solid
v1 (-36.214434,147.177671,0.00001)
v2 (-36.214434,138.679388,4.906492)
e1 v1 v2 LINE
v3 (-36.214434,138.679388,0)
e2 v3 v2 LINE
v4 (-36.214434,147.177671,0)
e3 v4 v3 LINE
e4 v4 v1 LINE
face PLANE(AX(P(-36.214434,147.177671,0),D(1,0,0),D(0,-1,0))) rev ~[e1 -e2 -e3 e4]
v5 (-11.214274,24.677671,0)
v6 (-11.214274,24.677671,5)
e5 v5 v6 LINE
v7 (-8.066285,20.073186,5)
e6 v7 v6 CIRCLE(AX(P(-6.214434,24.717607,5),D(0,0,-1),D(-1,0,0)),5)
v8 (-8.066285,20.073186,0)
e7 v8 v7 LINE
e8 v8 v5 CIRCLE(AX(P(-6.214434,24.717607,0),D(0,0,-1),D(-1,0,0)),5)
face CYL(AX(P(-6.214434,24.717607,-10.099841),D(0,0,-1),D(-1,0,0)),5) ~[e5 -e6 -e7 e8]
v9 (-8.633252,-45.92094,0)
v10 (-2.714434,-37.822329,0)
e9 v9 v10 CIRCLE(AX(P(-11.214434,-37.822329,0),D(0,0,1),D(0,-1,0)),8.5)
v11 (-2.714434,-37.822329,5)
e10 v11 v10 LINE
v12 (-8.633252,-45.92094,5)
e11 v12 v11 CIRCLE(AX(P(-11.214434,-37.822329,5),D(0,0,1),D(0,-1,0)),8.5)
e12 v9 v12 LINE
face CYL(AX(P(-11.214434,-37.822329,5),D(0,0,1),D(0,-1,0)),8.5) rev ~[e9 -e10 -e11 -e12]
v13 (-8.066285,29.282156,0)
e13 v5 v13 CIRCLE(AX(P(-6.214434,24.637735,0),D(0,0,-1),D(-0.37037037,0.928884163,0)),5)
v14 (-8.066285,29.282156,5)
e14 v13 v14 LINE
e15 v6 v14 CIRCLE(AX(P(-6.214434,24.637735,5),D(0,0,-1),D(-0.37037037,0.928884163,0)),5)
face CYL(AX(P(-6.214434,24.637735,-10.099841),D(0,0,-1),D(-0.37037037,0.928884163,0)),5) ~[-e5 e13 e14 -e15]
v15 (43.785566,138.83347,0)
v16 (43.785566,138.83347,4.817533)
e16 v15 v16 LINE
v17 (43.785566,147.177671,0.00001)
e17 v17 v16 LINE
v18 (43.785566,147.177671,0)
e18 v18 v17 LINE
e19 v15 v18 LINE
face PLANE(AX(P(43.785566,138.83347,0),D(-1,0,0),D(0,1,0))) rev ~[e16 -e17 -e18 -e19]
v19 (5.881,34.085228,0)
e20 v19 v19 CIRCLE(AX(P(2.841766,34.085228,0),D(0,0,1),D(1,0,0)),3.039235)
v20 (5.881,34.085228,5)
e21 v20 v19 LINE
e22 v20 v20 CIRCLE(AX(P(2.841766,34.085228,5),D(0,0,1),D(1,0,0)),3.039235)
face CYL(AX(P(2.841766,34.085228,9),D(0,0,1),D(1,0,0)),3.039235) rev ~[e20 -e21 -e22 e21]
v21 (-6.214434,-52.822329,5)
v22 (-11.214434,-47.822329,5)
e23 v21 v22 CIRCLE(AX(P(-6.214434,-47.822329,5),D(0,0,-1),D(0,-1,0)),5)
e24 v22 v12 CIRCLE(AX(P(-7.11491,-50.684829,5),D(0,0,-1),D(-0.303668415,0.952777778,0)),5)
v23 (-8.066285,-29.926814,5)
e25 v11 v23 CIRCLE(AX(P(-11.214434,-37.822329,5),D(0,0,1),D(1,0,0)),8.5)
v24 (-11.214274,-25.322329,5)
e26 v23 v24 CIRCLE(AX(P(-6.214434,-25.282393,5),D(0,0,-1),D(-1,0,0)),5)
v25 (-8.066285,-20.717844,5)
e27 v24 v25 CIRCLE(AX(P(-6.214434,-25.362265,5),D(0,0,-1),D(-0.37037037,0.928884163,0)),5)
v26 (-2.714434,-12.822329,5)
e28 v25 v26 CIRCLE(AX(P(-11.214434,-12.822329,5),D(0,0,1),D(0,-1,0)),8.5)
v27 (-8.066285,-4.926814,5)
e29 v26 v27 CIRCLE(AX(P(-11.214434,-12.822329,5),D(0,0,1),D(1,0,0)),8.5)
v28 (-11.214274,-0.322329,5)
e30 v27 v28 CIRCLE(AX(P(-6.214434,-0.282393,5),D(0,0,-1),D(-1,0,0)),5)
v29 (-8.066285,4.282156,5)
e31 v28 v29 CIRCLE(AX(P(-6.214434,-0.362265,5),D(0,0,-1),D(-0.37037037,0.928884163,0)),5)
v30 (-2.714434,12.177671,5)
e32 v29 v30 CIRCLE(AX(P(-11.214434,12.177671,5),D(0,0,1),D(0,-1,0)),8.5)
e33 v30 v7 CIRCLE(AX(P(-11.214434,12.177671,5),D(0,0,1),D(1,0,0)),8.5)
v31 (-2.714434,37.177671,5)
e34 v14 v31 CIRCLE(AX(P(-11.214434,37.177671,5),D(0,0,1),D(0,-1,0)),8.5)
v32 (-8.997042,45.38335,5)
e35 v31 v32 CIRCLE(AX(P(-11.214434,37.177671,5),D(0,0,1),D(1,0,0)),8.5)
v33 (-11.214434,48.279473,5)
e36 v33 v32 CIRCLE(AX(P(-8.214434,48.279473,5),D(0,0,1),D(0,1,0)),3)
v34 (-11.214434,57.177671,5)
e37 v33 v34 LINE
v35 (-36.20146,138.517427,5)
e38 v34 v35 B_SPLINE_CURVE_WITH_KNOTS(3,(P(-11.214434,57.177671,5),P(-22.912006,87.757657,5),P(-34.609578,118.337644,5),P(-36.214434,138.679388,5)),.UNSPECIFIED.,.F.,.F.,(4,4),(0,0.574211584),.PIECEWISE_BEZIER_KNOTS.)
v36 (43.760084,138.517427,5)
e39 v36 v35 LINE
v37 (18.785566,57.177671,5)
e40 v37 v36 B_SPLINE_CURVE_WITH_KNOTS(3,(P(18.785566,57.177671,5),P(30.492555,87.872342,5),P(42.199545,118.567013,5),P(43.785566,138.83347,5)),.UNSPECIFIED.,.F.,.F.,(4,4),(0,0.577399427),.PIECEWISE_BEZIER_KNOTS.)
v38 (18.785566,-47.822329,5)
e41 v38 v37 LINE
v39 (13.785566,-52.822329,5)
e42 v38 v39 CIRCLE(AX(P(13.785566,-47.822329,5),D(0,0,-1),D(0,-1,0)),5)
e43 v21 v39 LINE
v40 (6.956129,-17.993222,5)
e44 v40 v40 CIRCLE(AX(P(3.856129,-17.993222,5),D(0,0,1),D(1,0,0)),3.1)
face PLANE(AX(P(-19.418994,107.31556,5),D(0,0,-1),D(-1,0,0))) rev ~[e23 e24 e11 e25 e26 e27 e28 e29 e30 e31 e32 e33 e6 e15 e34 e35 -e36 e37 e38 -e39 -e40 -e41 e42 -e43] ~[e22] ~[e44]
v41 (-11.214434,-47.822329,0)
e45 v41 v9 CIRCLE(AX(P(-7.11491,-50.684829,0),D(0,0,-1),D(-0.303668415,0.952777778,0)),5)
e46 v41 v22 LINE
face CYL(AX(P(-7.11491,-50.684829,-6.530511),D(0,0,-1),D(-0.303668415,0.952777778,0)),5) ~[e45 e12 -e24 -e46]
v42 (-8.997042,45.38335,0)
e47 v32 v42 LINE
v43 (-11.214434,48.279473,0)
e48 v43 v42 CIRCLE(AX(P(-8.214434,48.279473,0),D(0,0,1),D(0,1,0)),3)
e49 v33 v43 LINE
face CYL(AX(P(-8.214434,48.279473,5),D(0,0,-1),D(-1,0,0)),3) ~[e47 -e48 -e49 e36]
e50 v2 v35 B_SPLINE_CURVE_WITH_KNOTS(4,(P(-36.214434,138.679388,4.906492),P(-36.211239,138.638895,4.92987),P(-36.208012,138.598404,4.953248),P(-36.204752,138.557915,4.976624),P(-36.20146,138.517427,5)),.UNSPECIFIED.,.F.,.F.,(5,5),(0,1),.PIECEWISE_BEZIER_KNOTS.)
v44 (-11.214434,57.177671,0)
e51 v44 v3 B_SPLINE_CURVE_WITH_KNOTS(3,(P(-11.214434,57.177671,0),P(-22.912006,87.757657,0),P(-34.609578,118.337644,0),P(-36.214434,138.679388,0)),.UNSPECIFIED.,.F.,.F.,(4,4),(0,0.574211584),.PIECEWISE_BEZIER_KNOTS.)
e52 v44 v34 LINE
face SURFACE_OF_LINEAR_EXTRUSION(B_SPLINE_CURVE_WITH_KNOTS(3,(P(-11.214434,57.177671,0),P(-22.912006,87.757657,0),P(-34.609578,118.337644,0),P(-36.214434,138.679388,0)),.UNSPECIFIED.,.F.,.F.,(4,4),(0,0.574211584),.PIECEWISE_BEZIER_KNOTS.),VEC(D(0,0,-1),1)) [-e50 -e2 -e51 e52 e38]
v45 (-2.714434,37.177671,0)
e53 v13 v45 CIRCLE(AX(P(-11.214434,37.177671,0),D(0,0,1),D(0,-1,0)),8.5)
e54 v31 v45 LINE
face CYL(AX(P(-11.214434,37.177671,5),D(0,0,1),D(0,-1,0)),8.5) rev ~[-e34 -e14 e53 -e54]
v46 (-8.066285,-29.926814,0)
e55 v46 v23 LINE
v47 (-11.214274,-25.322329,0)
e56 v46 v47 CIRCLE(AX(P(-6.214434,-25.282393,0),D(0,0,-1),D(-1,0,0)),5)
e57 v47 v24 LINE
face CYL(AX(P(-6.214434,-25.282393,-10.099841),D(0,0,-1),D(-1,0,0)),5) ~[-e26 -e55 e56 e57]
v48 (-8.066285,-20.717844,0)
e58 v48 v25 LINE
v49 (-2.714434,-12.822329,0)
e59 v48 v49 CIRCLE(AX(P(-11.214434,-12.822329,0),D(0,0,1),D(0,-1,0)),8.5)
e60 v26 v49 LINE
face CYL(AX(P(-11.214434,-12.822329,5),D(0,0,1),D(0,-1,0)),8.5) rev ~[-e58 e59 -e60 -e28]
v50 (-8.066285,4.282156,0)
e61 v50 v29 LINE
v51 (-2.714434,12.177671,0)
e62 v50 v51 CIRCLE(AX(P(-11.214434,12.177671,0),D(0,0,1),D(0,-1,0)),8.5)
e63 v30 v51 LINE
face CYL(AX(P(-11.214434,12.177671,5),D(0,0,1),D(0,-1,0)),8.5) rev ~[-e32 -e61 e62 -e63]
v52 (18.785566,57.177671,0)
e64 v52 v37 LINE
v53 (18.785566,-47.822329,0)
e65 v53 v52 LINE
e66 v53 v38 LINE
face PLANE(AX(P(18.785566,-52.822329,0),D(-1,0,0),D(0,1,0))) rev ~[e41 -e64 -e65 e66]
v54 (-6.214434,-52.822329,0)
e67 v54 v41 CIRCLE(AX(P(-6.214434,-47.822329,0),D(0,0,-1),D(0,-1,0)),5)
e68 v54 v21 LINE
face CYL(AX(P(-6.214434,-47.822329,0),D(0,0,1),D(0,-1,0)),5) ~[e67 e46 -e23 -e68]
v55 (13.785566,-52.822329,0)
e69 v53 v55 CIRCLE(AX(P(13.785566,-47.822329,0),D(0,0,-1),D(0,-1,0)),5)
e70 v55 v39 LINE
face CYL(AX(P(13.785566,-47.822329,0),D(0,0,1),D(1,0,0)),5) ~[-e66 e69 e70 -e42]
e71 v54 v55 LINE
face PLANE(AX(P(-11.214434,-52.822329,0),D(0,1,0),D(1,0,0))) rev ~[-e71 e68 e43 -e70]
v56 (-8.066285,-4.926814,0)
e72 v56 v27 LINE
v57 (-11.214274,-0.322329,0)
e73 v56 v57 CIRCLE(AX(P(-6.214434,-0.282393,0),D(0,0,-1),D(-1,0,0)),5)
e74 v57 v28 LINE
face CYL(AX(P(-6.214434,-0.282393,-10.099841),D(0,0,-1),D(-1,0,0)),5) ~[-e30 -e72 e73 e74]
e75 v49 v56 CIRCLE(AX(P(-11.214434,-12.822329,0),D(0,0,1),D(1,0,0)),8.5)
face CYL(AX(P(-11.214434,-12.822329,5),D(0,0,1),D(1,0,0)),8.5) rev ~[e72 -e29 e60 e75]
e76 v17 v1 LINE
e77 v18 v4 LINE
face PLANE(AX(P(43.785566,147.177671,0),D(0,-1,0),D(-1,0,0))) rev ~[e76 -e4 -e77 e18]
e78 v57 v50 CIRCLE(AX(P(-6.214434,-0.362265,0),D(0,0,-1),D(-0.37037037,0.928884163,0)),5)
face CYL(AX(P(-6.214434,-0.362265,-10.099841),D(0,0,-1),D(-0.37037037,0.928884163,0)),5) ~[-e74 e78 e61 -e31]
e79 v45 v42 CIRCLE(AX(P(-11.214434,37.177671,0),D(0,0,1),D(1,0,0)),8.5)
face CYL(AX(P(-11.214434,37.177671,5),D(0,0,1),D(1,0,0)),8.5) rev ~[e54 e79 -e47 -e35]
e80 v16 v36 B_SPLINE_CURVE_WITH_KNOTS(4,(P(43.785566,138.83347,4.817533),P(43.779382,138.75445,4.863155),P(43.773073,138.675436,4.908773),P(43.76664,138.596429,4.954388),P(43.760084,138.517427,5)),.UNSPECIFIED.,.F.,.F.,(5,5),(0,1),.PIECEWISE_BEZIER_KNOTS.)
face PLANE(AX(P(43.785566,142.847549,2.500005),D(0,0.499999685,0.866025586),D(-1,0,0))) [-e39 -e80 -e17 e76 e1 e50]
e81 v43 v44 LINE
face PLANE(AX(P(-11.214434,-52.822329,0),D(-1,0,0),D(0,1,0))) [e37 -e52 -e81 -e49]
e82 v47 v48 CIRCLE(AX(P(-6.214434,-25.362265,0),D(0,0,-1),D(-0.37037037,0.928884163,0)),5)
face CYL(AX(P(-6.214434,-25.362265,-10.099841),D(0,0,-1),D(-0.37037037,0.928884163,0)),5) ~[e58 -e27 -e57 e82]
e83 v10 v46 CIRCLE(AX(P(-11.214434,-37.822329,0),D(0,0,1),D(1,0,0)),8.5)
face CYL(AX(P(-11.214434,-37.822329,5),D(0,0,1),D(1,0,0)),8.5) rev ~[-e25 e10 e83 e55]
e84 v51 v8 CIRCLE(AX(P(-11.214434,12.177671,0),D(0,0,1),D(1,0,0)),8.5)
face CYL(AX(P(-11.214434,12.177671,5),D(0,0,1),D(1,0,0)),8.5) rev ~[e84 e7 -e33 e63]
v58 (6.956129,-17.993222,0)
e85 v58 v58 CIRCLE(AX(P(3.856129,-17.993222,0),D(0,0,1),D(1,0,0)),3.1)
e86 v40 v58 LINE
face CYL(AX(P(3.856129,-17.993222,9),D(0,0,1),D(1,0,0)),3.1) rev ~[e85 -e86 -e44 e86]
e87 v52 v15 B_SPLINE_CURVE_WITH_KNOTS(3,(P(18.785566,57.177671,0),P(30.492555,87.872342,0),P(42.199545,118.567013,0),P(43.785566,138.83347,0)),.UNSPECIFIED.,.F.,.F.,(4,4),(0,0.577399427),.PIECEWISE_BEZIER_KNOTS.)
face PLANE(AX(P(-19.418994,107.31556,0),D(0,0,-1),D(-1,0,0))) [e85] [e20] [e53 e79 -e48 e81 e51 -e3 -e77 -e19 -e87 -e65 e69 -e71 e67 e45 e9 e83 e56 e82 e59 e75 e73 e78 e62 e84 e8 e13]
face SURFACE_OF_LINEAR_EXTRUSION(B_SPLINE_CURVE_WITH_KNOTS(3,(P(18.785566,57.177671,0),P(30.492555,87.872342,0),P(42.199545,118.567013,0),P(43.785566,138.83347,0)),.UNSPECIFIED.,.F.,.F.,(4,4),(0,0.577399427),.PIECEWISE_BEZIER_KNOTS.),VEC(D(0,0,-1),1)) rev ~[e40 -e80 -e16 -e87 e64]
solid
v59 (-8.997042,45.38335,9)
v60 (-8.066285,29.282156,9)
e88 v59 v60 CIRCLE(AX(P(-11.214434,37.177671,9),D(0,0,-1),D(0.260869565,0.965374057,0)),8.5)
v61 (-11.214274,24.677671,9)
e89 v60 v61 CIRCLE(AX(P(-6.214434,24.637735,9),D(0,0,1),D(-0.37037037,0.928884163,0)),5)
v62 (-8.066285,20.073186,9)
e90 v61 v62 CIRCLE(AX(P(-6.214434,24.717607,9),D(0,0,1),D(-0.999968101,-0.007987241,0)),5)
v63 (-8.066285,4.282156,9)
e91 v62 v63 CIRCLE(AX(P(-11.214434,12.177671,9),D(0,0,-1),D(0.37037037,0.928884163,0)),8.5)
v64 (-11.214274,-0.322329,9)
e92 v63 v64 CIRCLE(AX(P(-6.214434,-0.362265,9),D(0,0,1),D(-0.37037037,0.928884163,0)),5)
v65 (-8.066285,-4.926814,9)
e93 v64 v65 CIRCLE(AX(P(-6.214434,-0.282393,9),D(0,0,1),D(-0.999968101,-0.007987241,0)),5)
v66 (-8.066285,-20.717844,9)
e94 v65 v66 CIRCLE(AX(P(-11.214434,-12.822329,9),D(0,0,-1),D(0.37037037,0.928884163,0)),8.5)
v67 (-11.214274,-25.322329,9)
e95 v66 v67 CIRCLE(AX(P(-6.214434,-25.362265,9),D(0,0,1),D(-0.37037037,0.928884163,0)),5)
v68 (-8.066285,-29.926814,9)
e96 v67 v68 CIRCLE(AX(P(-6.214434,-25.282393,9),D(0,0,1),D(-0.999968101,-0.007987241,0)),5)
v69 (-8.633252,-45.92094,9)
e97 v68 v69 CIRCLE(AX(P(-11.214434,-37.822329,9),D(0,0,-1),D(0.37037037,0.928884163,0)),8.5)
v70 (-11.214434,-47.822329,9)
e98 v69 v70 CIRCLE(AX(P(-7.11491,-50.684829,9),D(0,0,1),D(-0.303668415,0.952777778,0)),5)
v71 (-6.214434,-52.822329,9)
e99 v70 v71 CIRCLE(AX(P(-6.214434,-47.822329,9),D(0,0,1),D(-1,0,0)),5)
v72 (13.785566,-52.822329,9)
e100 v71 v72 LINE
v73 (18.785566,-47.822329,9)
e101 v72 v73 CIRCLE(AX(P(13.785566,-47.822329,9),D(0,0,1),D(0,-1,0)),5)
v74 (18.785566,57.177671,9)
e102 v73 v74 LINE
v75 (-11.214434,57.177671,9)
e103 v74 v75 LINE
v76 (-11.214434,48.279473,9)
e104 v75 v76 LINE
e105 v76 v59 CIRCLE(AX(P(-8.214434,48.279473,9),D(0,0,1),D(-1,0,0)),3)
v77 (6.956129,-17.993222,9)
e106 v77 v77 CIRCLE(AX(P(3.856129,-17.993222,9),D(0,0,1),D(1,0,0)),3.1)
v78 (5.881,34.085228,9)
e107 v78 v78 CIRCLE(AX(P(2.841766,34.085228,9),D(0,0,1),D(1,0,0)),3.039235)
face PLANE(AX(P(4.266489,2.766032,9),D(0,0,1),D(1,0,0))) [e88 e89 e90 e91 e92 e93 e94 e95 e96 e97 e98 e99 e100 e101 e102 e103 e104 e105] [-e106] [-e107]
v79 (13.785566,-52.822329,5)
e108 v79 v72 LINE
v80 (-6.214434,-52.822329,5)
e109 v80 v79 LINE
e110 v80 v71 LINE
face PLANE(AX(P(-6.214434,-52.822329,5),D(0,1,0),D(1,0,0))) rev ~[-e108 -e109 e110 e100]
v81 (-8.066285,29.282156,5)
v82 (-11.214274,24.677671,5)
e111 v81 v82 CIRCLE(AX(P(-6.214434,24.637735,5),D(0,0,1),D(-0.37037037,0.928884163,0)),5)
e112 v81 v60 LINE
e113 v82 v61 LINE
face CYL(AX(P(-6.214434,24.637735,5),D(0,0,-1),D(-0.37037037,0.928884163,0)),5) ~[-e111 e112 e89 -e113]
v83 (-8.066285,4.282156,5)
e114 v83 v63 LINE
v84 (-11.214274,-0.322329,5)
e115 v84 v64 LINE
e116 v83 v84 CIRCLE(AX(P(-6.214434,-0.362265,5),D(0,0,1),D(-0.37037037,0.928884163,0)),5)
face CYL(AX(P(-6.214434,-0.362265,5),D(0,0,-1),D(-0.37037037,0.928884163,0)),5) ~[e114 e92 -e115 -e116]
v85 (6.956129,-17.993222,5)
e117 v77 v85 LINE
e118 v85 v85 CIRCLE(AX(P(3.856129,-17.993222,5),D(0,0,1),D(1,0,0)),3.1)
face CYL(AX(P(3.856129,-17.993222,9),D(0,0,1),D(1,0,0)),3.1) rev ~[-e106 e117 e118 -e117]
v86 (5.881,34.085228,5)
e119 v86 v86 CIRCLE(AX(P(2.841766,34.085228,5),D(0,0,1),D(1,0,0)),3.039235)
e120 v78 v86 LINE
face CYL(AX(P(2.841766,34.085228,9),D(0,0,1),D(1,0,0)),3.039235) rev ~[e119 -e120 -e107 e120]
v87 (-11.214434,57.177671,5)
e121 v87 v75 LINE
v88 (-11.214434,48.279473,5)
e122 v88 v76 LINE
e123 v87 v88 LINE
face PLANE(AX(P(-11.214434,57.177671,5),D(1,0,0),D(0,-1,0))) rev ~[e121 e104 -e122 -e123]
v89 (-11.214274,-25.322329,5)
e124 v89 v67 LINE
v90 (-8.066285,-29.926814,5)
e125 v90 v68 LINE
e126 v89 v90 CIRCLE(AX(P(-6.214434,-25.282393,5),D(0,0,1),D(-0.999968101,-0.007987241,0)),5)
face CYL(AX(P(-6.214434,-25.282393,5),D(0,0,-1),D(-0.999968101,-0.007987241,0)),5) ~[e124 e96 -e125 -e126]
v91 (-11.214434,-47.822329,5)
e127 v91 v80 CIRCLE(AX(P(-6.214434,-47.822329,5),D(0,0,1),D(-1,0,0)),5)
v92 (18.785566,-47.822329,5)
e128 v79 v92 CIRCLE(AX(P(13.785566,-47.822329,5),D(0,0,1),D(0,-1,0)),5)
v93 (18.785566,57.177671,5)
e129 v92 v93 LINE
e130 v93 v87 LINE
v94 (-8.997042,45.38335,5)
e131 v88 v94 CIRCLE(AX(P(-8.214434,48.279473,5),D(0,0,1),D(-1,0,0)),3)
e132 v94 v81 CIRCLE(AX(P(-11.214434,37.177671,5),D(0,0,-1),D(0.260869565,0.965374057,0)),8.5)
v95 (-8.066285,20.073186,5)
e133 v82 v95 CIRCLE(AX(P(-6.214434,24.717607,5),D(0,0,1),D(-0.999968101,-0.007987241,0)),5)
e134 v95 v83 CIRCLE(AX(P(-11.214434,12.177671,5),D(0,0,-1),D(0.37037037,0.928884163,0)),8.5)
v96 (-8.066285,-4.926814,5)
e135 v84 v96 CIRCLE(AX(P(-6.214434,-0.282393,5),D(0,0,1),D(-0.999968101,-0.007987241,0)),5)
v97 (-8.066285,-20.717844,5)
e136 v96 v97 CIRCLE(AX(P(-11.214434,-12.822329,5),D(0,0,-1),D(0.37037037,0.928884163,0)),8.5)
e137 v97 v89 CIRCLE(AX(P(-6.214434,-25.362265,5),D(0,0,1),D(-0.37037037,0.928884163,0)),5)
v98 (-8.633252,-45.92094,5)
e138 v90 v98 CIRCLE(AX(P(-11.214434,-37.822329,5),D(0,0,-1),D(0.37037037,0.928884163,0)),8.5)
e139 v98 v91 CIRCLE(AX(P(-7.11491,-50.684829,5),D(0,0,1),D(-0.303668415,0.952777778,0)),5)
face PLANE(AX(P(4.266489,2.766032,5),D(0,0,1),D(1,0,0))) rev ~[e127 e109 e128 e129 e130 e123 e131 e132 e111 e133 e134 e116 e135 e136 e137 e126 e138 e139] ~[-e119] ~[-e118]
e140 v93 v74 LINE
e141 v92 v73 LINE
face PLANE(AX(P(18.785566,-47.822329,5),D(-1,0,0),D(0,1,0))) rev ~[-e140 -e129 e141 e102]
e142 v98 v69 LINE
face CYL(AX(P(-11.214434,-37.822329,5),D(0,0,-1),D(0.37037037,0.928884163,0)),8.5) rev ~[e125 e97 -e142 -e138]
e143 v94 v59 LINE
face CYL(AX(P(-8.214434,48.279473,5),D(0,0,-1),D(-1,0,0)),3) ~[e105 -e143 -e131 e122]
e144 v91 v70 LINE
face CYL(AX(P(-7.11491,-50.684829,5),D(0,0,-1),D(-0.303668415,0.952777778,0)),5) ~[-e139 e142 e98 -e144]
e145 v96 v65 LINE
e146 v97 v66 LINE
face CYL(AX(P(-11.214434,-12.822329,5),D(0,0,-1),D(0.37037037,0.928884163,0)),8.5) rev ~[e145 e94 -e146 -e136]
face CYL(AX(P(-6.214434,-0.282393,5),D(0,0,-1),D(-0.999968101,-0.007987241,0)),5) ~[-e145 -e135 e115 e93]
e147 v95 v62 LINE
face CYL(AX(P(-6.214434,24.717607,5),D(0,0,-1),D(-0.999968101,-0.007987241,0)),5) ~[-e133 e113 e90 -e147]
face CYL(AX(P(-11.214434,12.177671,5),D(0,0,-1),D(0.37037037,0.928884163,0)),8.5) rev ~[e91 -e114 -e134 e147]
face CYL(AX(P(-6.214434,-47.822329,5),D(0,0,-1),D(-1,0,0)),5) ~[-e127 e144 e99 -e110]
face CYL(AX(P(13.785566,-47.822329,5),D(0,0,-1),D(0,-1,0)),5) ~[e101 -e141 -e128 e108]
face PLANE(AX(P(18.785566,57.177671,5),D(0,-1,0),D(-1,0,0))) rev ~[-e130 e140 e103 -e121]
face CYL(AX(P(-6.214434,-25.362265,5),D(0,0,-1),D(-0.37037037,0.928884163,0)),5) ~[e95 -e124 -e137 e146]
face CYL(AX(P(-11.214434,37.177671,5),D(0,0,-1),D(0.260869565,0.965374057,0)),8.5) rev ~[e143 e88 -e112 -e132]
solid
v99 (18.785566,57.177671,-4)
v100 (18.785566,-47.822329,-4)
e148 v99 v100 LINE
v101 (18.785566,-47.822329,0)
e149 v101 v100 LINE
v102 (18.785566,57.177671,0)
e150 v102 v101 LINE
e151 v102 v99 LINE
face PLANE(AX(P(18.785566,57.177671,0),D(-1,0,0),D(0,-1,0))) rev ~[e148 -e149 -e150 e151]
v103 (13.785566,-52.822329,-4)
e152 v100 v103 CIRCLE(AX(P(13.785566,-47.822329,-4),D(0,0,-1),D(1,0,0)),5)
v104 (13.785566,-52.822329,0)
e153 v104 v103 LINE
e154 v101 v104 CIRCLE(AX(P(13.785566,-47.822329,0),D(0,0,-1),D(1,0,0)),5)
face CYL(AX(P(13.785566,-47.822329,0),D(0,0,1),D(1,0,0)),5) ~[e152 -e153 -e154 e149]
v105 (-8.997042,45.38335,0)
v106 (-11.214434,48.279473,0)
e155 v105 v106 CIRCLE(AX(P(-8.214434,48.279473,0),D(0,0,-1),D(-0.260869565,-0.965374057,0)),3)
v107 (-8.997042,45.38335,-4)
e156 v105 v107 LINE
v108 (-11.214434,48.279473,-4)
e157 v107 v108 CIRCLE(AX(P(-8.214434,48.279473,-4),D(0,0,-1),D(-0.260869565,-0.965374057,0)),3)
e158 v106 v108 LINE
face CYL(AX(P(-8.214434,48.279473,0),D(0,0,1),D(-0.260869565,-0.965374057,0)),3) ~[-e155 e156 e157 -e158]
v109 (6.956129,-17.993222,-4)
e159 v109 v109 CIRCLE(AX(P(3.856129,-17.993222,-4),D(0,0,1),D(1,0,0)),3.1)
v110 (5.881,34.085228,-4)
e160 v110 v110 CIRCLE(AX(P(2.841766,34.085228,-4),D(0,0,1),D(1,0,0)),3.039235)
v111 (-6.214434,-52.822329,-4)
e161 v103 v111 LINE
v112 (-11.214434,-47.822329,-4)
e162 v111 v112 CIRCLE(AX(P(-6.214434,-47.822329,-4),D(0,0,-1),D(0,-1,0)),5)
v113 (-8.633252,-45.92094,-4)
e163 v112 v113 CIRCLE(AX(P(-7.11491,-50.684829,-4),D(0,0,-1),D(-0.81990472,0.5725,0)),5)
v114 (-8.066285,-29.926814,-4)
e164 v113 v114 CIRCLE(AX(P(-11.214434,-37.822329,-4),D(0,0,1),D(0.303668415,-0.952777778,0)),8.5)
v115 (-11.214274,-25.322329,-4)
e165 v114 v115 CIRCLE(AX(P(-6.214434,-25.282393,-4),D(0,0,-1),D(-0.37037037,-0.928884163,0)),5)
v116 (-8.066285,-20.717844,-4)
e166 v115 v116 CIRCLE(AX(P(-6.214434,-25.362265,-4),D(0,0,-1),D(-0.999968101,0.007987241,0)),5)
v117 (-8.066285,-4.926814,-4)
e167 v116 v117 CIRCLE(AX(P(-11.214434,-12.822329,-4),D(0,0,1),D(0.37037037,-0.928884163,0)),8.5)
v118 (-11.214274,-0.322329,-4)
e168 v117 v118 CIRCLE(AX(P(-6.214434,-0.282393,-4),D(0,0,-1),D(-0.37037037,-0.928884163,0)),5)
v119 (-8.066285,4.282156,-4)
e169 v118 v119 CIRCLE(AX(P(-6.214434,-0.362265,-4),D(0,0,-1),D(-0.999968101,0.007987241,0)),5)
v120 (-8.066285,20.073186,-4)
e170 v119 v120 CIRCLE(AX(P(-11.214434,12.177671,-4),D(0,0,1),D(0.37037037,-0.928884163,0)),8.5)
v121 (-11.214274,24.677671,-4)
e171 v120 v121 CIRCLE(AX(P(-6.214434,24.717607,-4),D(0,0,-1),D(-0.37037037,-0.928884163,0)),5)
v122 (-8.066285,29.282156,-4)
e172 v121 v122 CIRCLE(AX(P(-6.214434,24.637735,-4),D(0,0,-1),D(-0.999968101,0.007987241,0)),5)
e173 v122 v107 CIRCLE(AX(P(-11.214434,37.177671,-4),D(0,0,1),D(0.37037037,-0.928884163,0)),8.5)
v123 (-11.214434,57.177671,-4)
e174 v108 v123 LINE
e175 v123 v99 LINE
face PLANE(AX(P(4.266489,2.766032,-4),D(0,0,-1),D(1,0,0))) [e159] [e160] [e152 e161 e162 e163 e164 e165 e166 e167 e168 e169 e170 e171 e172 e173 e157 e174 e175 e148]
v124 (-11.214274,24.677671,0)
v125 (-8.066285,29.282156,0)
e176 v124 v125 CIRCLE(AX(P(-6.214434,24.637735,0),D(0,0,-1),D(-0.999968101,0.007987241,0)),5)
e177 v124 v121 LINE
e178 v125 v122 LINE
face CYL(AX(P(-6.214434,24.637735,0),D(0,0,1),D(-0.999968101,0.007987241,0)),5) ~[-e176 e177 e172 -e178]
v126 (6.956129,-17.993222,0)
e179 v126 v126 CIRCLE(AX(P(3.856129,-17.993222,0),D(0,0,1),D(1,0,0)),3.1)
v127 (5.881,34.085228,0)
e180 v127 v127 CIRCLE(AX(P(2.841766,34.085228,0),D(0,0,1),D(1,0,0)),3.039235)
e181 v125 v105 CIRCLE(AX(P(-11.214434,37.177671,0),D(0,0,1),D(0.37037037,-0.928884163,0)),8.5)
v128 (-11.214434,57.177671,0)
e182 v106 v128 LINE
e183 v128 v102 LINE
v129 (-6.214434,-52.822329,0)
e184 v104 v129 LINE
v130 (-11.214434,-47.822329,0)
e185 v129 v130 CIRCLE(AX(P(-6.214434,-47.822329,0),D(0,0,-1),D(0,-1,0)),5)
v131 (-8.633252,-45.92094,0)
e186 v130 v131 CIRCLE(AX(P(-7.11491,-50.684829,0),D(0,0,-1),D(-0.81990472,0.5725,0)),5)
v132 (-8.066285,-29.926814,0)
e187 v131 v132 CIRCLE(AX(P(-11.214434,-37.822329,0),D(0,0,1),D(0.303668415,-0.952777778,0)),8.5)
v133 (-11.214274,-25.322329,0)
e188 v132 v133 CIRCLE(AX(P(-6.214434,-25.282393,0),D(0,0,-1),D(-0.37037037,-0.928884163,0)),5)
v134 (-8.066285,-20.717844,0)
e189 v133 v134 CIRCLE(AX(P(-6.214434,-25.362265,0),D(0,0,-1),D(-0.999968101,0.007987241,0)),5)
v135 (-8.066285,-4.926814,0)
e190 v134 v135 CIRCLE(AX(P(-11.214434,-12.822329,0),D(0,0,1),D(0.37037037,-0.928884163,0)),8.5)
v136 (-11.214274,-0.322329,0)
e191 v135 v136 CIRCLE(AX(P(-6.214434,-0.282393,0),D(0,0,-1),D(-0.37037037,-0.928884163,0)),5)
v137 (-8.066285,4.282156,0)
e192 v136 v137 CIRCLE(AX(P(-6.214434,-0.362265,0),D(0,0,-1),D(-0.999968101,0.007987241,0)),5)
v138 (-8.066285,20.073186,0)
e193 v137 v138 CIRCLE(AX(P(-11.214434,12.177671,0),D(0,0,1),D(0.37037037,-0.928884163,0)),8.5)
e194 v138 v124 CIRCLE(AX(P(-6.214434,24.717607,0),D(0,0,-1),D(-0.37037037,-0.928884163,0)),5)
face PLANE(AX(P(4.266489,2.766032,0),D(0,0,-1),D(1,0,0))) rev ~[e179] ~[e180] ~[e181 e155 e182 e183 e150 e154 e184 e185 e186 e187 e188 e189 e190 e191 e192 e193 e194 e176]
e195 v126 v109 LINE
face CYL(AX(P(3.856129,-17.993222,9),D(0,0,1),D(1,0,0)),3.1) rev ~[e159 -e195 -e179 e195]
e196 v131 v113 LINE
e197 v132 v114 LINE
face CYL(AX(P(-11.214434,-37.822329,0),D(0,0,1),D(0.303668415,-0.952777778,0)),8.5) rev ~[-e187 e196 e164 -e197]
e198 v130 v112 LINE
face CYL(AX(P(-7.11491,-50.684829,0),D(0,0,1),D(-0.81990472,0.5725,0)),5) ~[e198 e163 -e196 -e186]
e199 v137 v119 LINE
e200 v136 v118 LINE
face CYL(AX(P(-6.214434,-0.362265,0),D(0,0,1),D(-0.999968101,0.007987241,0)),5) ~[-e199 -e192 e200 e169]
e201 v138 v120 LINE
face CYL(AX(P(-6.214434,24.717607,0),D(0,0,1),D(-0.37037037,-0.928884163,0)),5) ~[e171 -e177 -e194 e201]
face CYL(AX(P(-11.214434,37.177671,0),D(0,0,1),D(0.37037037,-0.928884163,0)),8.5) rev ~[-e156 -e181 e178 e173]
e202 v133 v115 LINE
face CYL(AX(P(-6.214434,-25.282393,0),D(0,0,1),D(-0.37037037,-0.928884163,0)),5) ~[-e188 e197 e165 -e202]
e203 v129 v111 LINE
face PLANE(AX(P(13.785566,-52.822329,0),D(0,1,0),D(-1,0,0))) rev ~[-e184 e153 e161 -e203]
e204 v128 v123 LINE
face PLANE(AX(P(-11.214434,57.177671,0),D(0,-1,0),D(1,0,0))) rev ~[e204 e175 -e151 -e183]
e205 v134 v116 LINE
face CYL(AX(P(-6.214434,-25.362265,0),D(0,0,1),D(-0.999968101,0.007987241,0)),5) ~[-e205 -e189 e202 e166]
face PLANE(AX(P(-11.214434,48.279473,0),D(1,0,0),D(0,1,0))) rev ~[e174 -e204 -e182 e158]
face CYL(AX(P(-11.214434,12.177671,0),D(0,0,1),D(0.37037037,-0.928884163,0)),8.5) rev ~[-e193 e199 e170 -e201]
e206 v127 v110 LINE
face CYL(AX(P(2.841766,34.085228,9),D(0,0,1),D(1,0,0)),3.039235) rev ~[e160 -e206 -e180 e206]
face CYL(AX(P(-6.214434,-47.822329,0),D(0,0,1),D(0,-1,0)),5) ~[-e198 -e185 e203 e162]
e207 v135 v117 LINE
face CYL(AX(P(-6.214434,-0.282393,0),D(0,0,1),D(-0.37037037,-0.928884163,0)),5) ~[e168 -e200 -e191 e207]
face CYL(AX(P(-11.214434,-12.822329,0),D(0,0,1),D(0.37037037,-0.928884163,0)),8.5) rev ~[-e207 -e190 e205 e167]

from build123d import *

# Parameters (mm, degrees)
F0_W        = 30
F0_H        = 90
F0_H_2      = 110
F1_DEPTH    = 5
F3_R        = 5
F4_DEPTH    = 25
F5_T1_DEPTH = 25.1996810199
F5_T3_DEPTH = 18.0610213145
F6_R        = 3
F7_SIZE2    = 8.660244
F7_SIZE     = 4.99999
F9_DEPTH    = 4
F11_DEPTH   = 4
F12_R       = 3.0392347024
F12_R_2     = 3.1
F13_DEPTH   = 25


# Not quite as in the source:
# - a fillet or chamfer that OpenCascade refuses, or shapes differently, is made with other operations: its cross-section is extruded or revolved along the edge and cut away or added
# - a fillet or chamfer is up to 0.001 mm smaller than in the source, because OpenCascade refuses the exact size


with BuildPart() as f1:
    # F0 (on Top) → F1 (new body)
    with BuildSketch(Plane.XY):
        with BuildLine():
            add(Edge.make_bspline(
                [(-11.2144336104, 57.1776708961), (-22.912006026, 87.7576573075), (-34.6095784415, 118.3376437189), (-36.2144336104, 138.6793877413)],
                knots=[0, 0, 0, 0, 0.5742115835, 0.5742115835, 0.5742115835, 0.5742115835], degree=3))
            Line((-11.2144336104, 57.1776708961), (-11.2144336104, 147.1776708961))
            Line((-11.2144336104, 147.1776708961), (-36.2144336104, 147.1776708961))
            Line((-36.2144336104, 147.1776708961), (-36.2144336104, 138.6793877413))
        make_face()
        with Locations((3.7855663896, 102.1776708961)):
            Rectangle(F0_W, F0_H)
        with BuildLine():
            Line((18.7855663896, 147.1776708961), (18.7855663896, 57.1776708961))
            add(Edge.make_bspline(
                [(18.7855663896, 57.1776708961), (30.4925554698, 87.8723420853), (42.1995445501, 118.5670132745), (43.7855663896, 138.8334699858)],
                knots=[0, 0, 0, 0, 0.5773994274, 0.5773994274, 0.5773994274, 0.5773994274], degree=3))
            Line((43.7855663896, 138.8334699858), (43.7855663896, 147.1776708961))
            Line((43.7855663896, 147.1776708961), (18.7855663896, 147.1776708961))
        make_face()
        with Locations((3.7855663896, 2.1776708961)):
            Rectangle(F0_W, F0_H_2)
    extrude(amount=F1_DEPTH)

    # F3
    f3_edges = [f1.edges().sort_by_distance(p)[0] for p in [
        (-11.214434, -52.822329, 2.5),
        (18.785566, -52.822329, 2.5),
    ]]
    fillet(f3_edges, radius=F3_R)

    # F2 (on face) → F4 (cut)
    with BuildSketch(Plane.XY.offset(5)):
        with BuildLine():
            ThreePointArc((-11.2144336104, 28.6776708961), (-5.2040259704, 31.167263256), (-2.7144336104, 37.1776708961))
            ThreePointArc((-2.7144336104, 37.1776708961), (-5.2040259704, 43.1880785361), (-11.2144336104, 45.6776708961))
            Line((-11.2144336104, 45.6776708961), (-11.2144336104, 28.6776708961))
        make_face()
        with BuildLine():
            ThreePointArc((-2.7144336104, 12.1776708961), (-5.2040259704, 18.1880785361), (-11.2144336104, 20.6776708961))
            Line((-11.2144336104, 20.6776708961), (-11.2144336104, 3.6776708961))
            ThreePointArc((-11.2144336104, 3.6776708961), (-5.2040259704, 6.167263256), (-2.7144336104, 12.1776708961))
        make_face()
        with BuildLine():
            ThreePointArc((-2.7144336104, -12.8223291039), (-5.2040259704, -6.8119214639), (-11.2144336104, -4.3223291039))
            Line((-11.2144336104, -4.3223291039), (-11.2144336104, -21.3223291039))
            ThreePointArc((-11.2144336104, -21.3223291039), (-5.2040259704, -18.832736744), (-2.7144336104, -12.8223291039))
        make_face()
        with BuildLine():
            ThreePointArc((-2.7144336104, -37.8223291039), (-5.2040259704, -31.8119214639), (-11.2144336104, -29.3223291039))
            Line((-11.2144336104, -29.3223291039), (-11.2144336104, -46.3223291039))
            ThreePointArc((-11.2144336104, -46.3223291039), (-5.2040259704, -43.832736744), (-2.7144336104, -37.8223291039))
        make_face()
    extrude(amount=-F4_DEPTH, mode=Mode.SUBTRACT)

    # F5: fillet of radius 5 on 7 edges, made by hand

    # F5_s2 → F5_t1 (cut)
    with BuildSketch(Plane.XY.offset(-10.09984051)):
        with BuildLine():
            ThreePointArc((-11.2144336104, -0.2823929), (-10.3532292843, -3.0878109384), (-8.0662854623, -4.9268137163))
            ThreePointArc((-8.0662854623, -4.9268137163), (-9.6116049851, -4.4748180738), (-11.2144336104, -4.3223291039))
            Line((-11.2144336104, -4.3223291039), (-11.2144336104, -0.2823929))
        make_face()
        with BuildLine():
            ThreePointArc((-8.0662854623, 4.2821555084), (-10.3532292843, 2.4431527305), (-11.2144336104, -0.3622653079))
            Line((-11.2144336104, -0.3622653079), (-11.2144336104, 3.6776708961))
            ThreePointArc((-11.2144336104, 3.6776708961), (-9.6116049851, 3.8301598659), (-8.0662854623, 4.2821555084))
        make_face()
        with BuildLine():
            ThreePointArc((-8.0662854623, -20.7178444916), (-10.3532292843, -22.5568472695), (-11.2144336104, -25.3622653079))
            Line((-11.2144336104, -25.3622653079), (-11.2144336104, -21.3223291039))
            ThreePointArc((-11.2144336104, -21.3223291039), (-9.6116049851, -21.1698401341), (-8.0662854623, -20.7178444916))
        make_face()
        with BuildLine():
            ThreePointArc((-11.2144336104, -25.2823929), (-10.3532292843, -28.0878109384), (-8.0662854623, -29.9268137163))
            ThreePointArc((-8.0662854623, -29.9268137163), (-9.6116049851, -29.4748180738), (-11.2144336104, -29.3223291039))
            Line((-11.2144336104, -29.3223291039), (-11.2144336104, -25.2823929))
        make_face()
        with BuildLine():
            ThreePointArc((-11.2144336104, 24.7176071), (-10.3532292843, 21.9121890616), (-8.0662854623, 20.0731862837))
            ThreePointArc((-8.0662854623, 20.0731862837), (-9.6116049851, 20.5251819262), (-11.2144336104, 20.6776708961))
            Line((-11.2144336104, 20.6776708961), (-11.2144336104, 24.7176071))
        make_face()
        with BuildLine():
            ThreePointArc((-8.0662854623, 29.2821555084), (-10.3532292843, 27.4431527305), (-11.2144336104, 24.6377346921))
            Line((-11.2144336104, 24.6377346921), (-11.2144336104, 28.6776708961))
            ThreePointArc((-11.2144336104, 28.6776708961), (-9.6116049851, 28.8301598659), (-8.0662854623, 29.2821555084))
        make_face()
    extrude(amount=F5_T1_DEPTH, mode=Mode.SUBTRACT)

    # F5_s4 → F5_t3 (cut)
    with BuildSketch(Plane.XY.offset(-6.5305106572)):
        with BuildLine():
            ThreePointArc((-8.6332520843, -45.9209402151), (-10.0803650529, -46.6591519697), (-11.2144336104, -47.8223291039))
            Line((-11.2144336104, -47.8223291039), (-11.2144336104, -46.3223291039))
            ThreePointArc((-11.2144336104, -46.3223291039), (-9.908331479, -46.2213824567), (-8.6332520843, -45.9209402151))
        make_face()
    extrude(amount=F5_T3_DEPTH, mode=Mode.SUBTRACT)

    # F6
    f6_edges = [f1.edges().sort_by_distance(p)[0] for p in [
        (-11.214434, 45.677671, 2.5),
    ]]
    fillet(f6_edges, radius=F6_R)

    # F7 (size 5 and 8.6602540378 in the source; OpenCascade refuses exactly that, so slightly less here)
    f7_edges = [f1.edges().sort_by_distance(p)[0] for p in [
        (3.785566, 147.177671, 5),
    ]]
    f7_side = f1.faces().sort_by_distance((3.785566, 147.177671, 2.5))[0]
    chamfer(f7_edges, length=F7_SIZE, length2=F7_SIZE2, reference=f7_side)


with BuildPart() as f9:
    # F8 (on face) → F9 (new body)
    with BuildSketch(Plane.XY.offset(5)):
        with BuildLine():
            Line((18.7855663896, 57.1776708961), (-11.2144336104, 57.1776708961))
            Line((-11.2144336104, 57.1776708961), (-11.2144336104, 48.2794725516))
            ThreePointArc((-11.2144336104, 48.2794725516), (-10.5964313106, 46.455716275), (-8.9970423061, 45.3833503806))
            ThreePointArc((-8.9970423061, 45.3833503806), (-2.7285999753, 37.6682088837), (-8.0662854623, 29.2821555084))
            ThreePointArc((-8.0662854623, 29.2821555084), (-10.3419924147, 27.4596592689), (-11.2142741178, 24.677670896))
            ThreePointArc((-11.2142741178, 24.677670896), (-10.3419924147, 21.8956825232), (-8.0662854623, 20.0731862837))
            ThreePointArc((-8.0662854623, 20.0731862837), (-2.7144336104, 12.1776708961), (-8.0662854623, 4.2821555084))
            ThreePointArc((-8.0662854623, 4.2821555084), (-10.3419924147, 2.4596592689), (-11.2142741178, -0.322329104))
            ThreePointArc((-11.2142741178, -0.322329104), (-10.3419924147, -3.1043174768), (-8.0662854623, -4.9268137163))
            ThreePointArc((-8.0662854623, -4.9268137163), (-2.7144336104, -12.8223291039), (-8.0662854623, -20.7178444916))
            ThreePointArc((-8.0662854623, -20.7178444916), (-10.3419924147, -22.5403407311), (-11.2142741178, -25.322329104))
            ThreePointArc((-11.2142741178, -25.322329104), (-10.3419924147, -28.1043174768), (-8.0662854623, -29.9268137163))
            ThreePointArc((-8.0662854623, -29.9268137163), (-2.7197690942, -38.123451597), (-8.6332520843, -45.9209402151))
            ThreePointArc((-8.6332520843, -45.9209402151), (-10.0803650529, -46.6591519697), (-11.2144336104, -47.8223291039))
            ThreePointArc((-11.2144336104, -47.8223291039), (-9.7499675164, -51.3578630099), (-6.2144336104, -52.8223291039))
            Line((-6.2144336104, -52.8223291039), (13.7855663896, -52.8223291039))
            ThreePointArc((13.7855663896, -52.8223291039), (17.3211002955, -51.3578630099), (18.7855663896, -47.8223291039))
            Line((18.7855663896, -47.8223291039), (18.7855663896, 57.1776708961))
        make_face()
    extrude(amount=F9_DEPTH)


with BuildPart() as f11:
    # F10 (on face) → F11 (new body)
    with BuildSketch(Plane(origin=(0, 0, 0), x_dir=(1, 0, 0), z_dir=(0, 0, -1))):
        with BuildLine():
            Line((-11.2144336104, -57.1776708961), (18.7855663896, -57.1776708961))
            Line((18.7855663896, -57.1776708961), (18.7855663896, 47.8223291039))
            ThreePointArc((18.7855663896, 47.8223291039), (17.3211002955, 51.3578630099), (13.7855663896, 52.8223291039))
            Line((13.7855663896, 52.8223291039), (-6.2144336104, 52.8223291039))
            ThreePointArc((-6.2144336104, 52.8223291039), (-9.7499675164, 51.3578630099), (-11.2144336104, 47.8223291039))
            ThreePointArc((-11.2144336104, 47.8223291039), (-10.0803650529, 46.6591519697), (-8.6332520843, 45.9209402151))
            ThreePointArc((-8.6332520843, 45.9209402151), (-2.7197690942, 38.123451597), (-8.0662854623, 29.9268137163))
            ThreePointArc((-8.0662854623, 29.9268137163), (-10.3419924147, 28.1043174768), (-11.2142741178, 25.322329104))
            ThreePointArc((-11.2142741178, 25.322329104), (-10.3419924147, 22.5403407311), (-8.0662854623, 20.7178444916))
            ThreePointArc((-8.0662854623, 20.7178444916), (-2.7144336104, 12.8223291039), (-8.0662854623, 4.9268137163))
            ThreePointArc((-8.0662854623, 4.9268137163), (-10.3419924147, 3.1043174768), (-11.2142741178, 0.322329104))
            ThreePointArc((-11.2142741178, 0.322329104), (-10.3419924147, -2.4596592689), (-8.0662854623, -4.2821555084))
            ThreePointArc((-8.0662854623, -4.2821555084), (-2.7144336104, -12.1776708961), (-8.0662854623, -20.0731862837))
            ThreePointArc((-8.0662854623, -20.0731862837), (-10.3419924147, -21.8956825232), (-11.2142741178, -24.677670896))
            ThreePointArc((-11.2142741178, -24.677670896), (-10.3419924147, -27.4596592689), (-8.0662854623, -29.2821555084))
            ThreePointArc((-8.0662854623, -29.2821555084), (-2.7285999753, -37.6682088837), (-8.9970423061, -45.3833503806))
            ThreePointArc((-8.9970423061, -45.3833503806), (-10.5964313106, -46.455716275), (-11.2144336104, -48.2794725516))
            Line((-11.2144336104, -48.2794725516), (-11.2144336104, -57.1776708961))
        make_face()
    extrude(amount=F11_DEPTH)


with BuildPart() as f13_tool:
    # F12 (on face) → F13 (new body)
    with BuildSketch(Plane.XY.offset(9)):
        with Locations((2.841765537, 34.0852281909)):
            Circle(F12_R)
        with Locations((3.8561289876, -17.9932220587)):
            Circle(F12_R_2)
    extrude(amount=-F13_DEPTH)


with BuildPart() as f1_1:
    add(f1.part)

    # F13: cut by f13_tool
    add(f13_tool.part, mode=Mode.SUBTRACT)


with BuildPart() as f9_1:
    add(f9.part)

    # F13: cut by f13_tool
    add(f13_tool.part, mode=Mode.SUBTRACT)


with BuildPart() as f11_1:
    add(f11.part)

    # F13: cut by f13_tool
    add(f13_tool.part, mode=Mode.SUBTRACT)


solid = Compound([f1_1.part, f9_1.part, f11_1.part])
